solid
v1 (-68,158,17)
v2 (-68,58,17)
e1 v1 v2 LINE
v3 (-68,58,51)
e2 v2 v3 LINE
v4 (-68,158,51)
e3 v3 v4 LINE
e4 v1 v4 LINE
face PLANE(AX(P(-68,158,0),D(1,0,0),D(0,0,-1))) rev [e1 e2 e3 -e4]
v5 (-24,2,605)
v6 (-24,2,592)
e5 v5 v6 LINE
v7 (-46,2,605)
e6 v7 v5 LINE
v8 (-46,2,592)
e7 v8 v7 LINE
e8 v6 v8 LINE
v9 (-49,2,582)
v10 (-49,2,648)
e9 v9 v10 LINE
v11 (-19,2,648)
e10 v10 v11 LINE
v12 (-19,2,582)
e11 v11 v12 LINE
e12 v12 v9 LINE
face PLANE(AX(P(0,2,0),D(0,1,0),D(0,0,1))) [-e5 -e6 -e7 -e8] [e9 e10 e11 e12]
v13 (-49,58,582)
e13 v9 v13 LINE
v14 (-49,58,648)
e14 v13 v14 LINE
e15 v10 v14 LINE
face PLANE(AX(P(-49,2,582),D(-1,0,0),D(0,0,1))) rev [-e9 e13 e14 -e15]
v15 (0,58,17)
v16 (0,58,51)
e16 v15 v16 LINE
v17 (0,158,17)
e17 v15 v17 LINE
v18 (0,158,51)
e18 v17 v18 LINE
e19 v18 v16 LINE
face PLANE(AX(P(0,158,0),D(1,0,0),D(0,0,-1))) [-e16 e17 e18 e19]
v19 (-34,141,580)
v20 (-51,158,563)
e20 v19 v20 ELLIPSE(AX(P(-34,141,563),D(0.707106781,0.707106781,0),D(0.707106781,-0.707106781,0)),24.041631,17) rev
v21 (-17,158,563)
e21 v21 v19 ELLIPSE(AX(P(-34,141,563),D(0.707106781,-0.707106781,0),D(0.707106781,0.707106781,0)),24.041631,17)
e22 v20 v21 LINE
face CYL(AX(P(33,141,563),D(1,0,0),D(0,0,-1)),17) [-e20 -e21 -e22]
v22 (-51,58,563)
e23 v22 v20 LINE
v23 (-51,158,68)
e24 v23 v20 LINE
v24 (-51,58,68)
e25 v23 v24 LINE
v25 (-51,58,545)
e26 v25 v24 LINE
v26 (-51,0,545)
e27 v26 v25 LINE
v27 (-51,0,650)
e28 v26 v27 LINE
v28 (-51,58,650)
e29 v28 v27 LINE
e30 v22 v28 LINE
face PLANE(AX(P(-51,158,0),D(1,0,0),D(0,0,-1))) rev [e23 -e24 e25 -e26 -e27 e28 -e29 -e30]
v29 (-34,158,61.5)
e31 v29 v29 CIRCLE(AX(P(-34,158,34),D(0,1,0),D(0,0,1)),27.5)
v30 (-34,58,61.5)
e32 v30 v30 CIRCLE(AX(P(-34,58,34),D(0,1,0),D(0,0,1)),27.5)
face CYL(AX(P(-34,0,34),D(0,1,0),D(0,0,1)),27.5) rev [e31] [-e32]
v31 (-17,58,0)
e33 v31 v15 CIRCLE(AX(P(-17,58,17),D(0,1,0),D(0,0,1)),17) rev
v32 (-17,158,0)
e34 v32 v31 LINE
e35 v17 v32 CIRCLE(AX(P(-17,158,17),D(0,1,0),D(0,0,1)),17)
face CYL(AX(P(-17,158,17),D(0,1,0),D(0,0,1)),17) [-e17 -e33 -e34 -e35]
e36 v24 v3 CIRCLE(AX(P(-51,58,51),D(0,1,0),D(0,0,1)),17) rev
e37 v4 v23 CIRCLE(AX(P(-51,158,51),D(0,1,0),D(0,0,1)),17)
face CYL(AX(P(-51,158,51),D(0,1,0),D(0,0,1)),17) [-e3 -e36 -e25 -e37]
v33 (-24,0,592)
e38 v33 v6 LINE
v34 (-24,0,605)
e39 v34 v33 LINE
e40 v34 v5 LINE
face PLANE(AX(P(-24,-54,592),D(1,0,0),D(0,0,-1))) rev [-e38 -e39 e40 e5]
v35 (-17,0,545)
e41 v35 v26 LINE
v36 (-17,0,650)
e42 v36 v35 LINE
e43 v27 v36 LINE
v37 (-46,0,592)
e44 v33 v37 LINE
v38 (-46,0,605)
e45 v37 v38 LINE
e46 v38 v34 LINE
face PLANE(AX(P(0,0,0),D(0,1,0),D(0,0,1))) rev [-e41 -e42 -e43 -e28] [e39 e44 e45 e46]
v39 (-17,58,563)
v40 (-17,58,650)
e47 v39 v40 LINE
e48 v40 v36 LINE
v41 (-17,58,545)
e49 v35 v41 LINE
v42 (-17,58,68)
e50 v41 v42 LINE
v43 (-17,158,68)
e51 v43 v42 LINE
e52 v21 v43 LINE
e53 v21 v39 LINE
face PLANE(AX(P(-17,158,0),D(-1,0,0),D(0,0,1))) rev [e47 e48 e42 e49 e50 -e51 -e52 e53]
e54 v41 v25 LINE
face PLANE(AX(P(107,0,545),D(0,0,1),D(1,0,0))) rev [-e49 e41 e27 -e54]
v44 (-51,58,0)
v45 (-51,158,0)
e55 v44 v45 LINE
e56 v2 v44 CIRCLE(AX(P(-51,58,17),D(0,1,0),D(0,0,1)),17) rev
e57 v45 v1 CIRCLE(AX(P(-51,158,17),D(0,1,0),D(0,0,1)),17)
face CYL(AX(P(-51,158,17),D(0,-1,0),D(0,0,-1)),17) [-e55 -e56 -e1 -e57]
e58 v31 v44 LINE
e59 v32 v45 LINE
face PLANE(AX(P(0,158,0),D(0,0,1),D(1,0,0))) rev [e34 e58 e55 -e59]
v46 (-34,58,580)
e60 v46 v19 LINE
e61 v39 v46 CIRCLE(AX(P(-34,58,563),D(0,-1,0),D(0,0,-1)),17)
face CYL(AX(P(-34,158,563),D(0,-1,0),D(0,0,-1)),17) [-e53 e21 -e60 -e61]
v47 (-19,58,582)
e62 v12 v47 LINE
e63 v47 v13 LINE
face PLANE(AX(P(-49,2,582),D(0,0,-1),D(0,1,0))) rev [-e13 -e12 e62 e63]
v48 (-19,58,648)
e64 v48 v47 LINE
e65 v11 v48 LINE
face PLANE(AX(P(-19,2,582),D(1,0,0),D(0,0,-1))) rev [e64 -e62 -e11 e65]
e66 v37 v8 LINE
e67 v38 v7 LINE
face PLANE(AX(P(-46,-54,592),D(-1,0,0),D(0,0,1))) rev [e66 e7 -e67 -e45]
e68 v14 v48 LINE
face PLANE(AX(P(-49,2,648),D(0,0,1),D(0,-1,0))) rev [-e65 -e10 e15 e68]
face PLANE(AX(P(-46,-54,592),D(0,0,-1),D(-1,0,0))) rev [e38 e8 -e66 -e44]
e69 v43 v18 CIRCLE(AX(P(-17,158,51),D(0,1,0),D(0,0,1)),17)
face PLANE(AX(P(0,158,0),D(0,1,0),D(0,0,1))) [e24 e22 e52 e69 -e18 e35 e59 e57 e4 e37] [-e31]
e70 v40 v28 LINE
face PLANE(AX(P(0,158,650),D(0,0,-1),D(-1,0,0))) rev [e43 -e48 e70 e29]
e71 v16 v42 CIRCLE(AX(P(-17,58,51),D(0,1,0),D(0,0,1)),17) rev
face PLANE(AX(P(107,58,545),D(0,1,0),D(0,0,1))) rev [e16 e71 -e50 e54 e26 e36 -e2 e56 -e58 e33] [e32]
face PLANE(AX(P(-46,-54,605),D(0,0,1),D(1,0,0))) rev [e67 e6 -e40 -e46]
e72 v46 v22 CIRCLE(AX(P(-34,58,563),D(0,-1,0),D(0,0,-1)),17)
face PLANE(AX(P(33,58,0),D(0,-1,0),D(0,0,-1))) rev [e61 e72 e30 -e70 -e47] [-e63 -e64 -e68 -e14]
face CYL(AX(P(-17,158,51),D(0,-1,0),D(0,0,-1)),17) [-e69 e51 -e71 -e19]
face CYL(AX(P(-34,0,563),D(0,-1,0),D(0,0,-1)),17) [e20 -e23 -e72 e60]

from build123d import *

# Parameters (mm, degrees)
SKETCH2_W           = 34
SKETCH2_H           = 512
SKETCH2_H_2         = 70
SKETCH2_W_2         = 68
SKETCH2_H_3         = 68
BOSS_EXTRUDE1_DEPTH = 158
FILLET1_R           = 17
SKETCH3_W           = 599.373930515
SKETCH3_H           = 58
CUT_EXTRUDE1_DEPTH  = 158
SKETCH4_W           = 68
SKETCH4_H           = 58
CUT_EXTRUDE2_DEPTH  = 158
SKETCH5_R           = 27.5
CUT_EXTRUDE3_DEPTH  = 158
SKETCH6_W           = 70
SKETCH6_H           = 100
CUT_EXTRUDE4_DEPTH  = 84
SKETCH7_W           = 30
SKETCH7_H           = 66
CUT_EXTRUDE6_DEPTH  = 56
SKETCH8_W           = 22
SKETCH8_H           = 13
CUT_EXTRUDE7_DEPTH  = 56
FILLET2_R           = 17
SKETCH9_W           = 455
SKETCH9_H           = 70
CUT_EXTRUDE8_DEPTH  = 111
SKETCH10_W          = 470.461866989
SKETCH10_H          = 86.836519433
BOSS_EXTRUDE3_DEPTH = 34


# Some blends are built 0.0001 mm under size
with BuildPart() as part:
    # Sketch2 → Boss-Extrude1 (new body)
    with BuildSketch(Plane(origin=(0, 0, 0), x_dir=(1, 0, 0), z_dir=(0, 1, 0))):
        with Locations((-34, -324)):
            Rectangle(SKETCH2_W, SKETCH2_H)
        with Locations((-34, -615)):
            Rectangle(SKETCH2_W, SKETCH2_H_2)
        with Locations((-34, -34)):
            Rectangle(SKETCH2_W_2, SKETCH2_H_3)
    extrude(amount=BOSS_EXTRUDE1_DEPTH)

    # Fillet1
    fillet1_edges = [part.edges().sort_by_distance(p)[0] for p in [
        (0, 79, 0),
        (0, 79, 68),
        (-68, 79, 0),
        (-68, 79, 68),
    ]]
    fillet(fillet1_edges, radius=FILLET1_R - 0.0001)  # a hair under: the kernel refuses the full size

    # Sketch3 → Cut-Extrude1 (cut)
    with BuildSketch(Plane.ZY.offset(51)):
        with Locations((245.313034743, 29)):
            Rectangle(SKETCH3_W, SKETCH3_H)
    extrude(amount=-CUT_EXTRUDE1_DEPTH, mode=Mode.SUBTRACT)

    # Sketch4 → Cut-Extrude2 (cut)
    with BuildSketch(Plane(origin=(-51, 0, 0), x_dir=(0, 0, -1), z_dir=(1, 0, 0))):
        with Locations((-34, 29)):
            Rectangle(SKETCH4_W, SKETCH4_H)
    extrude(amount=-CUT_EXTRUDE2_DEPTH, mode=Mode.SUBTRACT)

    # Sketch5 → Cut-Extrude3 (cut)
    with BuildSketch(Plane(origin=(0, 158, 0), x_dir=(1, 0, 0), z_dir=(0, 1, 0))):
        with Locations(Location((-34, -34, 0), (0, 0, 270))):
            Circle(SKETCH5_R)
    extrude(amount=-CUT_EXTRUDE3_DEPTH, mode=Mode.SUBTRACT)

    # Sketch6 → Cut-Extrude4 (cut)
    with BuildSketch(Plane.ZY.offset(51)):
        with Locations((615, 108)):
            Rectangle(SKETCH6_W, SKETCH6_H)
    extrude(amount=-CUT_EXTRUDE4_DEPTH, mode=Mode.SUBTRACT)

    # Sketch7 → Cut-Extrude6 (cut)
    with BuildSketch(Plane(origin=(0, 58, 0), x_dir=(1, 0, 0), z_dir=(0, 1, 0))):
        with Locations((-34, -615)):
            Rectangle(SKETCH7_W, SKETCH7_H)
    extrude(amount=-CUT_EXTRUDE6_DEPTH, mode=Mode.SUBTRACT)

    # Sketch8 → Cut-Extrude7 (cut)
    with BuildSketch(Plane(origin=(0, 2, 0), x_dir=(1, 0, 0), z_dir=(0, 1, 0))):
        with Locations((-35, -598.5)):
            Rectangle(SKETCH8_W, SKETCH8_H)
    extrude(amount=-CUT_EXTRUDE7_DEPTH, mode=Mode.SUBTRACT)

    # Fillet2
    # the kernel refuses this fillet: 17 mm, written as the material it adds along each edge
    # the kernel refuses this fillet: 17 mm, written as the material it takes off along each edge
    with BuildSketch(Plane(origin=(-93.5, 158, 580), x_dir=(0, 0, -1), z_dir=(1, 0, 0))) as fillet2_2_piece_1:
        with BuildLine():
            CenterArc((FILLET2_R, -FILLET2_R), FILLET2_R, 90, 90)
            Line((0, -FILLET2_R), (0, 0))
            Line((0, 0), (FILLET2_R, 0))
        make_face()
    extrude(amount=119, mode=Mode.SUBTRACT)
    with BuildSketch(Plane(origin=(-17, 200.5, 580), x_dir=(0, 0, -1), z_dir=(0, -1, 0))) as fillet2_2_piece_2:
        with BuildLine():
            CenterArc((FILLET2_R, -FILLET2_R), FILLET2_R, 90, 90)
            Line((0, -FILLET2_R), (0, 0))
            Line((0, 0), (FILLET2_R, 0))
        make_face()
    extrude(amount=142.5, mode=Mode.SUBTRACT)
    with BuildSketch(Plane(origin=(-51, 200.5, 580), x_dir=(0, 0, -1), z_dir=(0, -1, 0))) as fillet2_2_piece_3:
        with BuildLine():
            CenterArc((FILLET2_R, FILLET2_R), FILLET2_R, 180, 90)
            Line((0, FILLET2_R), (0, 0))
            Line((0, 0), (FILLET2_R, 0))
        make_face()
    extrude(amount=142.5, mode=Mode.SUBTRACT)

    # Sketch9 → Cut-Extrude8 (cut)
    with BuildSketch(Plane(origin=(-17, 0, 0), x_dir=(0, 0, -1), z_dir=(1, 0, 0))):
        with Locations((-315.5, 108)):
            Rectangle(SKETCH9_W, SKETCH9_H)
    extrude(amount=-CUT_EXTRUDE8_DEPTH, mode=Mode.SUBTRACT)

    # Sketch10 → Boss-Extrude3 (add)
    with BuildSketch(Plane.ZY.offset(51)):
        with Locations((313.691639381, 107.94529393)):
            Rectangle(SKETCH10_W, SKETCH10_H)
    extrude(amount=-BOSS_EXTRUDE3_DEPTH)


solid = part.part
